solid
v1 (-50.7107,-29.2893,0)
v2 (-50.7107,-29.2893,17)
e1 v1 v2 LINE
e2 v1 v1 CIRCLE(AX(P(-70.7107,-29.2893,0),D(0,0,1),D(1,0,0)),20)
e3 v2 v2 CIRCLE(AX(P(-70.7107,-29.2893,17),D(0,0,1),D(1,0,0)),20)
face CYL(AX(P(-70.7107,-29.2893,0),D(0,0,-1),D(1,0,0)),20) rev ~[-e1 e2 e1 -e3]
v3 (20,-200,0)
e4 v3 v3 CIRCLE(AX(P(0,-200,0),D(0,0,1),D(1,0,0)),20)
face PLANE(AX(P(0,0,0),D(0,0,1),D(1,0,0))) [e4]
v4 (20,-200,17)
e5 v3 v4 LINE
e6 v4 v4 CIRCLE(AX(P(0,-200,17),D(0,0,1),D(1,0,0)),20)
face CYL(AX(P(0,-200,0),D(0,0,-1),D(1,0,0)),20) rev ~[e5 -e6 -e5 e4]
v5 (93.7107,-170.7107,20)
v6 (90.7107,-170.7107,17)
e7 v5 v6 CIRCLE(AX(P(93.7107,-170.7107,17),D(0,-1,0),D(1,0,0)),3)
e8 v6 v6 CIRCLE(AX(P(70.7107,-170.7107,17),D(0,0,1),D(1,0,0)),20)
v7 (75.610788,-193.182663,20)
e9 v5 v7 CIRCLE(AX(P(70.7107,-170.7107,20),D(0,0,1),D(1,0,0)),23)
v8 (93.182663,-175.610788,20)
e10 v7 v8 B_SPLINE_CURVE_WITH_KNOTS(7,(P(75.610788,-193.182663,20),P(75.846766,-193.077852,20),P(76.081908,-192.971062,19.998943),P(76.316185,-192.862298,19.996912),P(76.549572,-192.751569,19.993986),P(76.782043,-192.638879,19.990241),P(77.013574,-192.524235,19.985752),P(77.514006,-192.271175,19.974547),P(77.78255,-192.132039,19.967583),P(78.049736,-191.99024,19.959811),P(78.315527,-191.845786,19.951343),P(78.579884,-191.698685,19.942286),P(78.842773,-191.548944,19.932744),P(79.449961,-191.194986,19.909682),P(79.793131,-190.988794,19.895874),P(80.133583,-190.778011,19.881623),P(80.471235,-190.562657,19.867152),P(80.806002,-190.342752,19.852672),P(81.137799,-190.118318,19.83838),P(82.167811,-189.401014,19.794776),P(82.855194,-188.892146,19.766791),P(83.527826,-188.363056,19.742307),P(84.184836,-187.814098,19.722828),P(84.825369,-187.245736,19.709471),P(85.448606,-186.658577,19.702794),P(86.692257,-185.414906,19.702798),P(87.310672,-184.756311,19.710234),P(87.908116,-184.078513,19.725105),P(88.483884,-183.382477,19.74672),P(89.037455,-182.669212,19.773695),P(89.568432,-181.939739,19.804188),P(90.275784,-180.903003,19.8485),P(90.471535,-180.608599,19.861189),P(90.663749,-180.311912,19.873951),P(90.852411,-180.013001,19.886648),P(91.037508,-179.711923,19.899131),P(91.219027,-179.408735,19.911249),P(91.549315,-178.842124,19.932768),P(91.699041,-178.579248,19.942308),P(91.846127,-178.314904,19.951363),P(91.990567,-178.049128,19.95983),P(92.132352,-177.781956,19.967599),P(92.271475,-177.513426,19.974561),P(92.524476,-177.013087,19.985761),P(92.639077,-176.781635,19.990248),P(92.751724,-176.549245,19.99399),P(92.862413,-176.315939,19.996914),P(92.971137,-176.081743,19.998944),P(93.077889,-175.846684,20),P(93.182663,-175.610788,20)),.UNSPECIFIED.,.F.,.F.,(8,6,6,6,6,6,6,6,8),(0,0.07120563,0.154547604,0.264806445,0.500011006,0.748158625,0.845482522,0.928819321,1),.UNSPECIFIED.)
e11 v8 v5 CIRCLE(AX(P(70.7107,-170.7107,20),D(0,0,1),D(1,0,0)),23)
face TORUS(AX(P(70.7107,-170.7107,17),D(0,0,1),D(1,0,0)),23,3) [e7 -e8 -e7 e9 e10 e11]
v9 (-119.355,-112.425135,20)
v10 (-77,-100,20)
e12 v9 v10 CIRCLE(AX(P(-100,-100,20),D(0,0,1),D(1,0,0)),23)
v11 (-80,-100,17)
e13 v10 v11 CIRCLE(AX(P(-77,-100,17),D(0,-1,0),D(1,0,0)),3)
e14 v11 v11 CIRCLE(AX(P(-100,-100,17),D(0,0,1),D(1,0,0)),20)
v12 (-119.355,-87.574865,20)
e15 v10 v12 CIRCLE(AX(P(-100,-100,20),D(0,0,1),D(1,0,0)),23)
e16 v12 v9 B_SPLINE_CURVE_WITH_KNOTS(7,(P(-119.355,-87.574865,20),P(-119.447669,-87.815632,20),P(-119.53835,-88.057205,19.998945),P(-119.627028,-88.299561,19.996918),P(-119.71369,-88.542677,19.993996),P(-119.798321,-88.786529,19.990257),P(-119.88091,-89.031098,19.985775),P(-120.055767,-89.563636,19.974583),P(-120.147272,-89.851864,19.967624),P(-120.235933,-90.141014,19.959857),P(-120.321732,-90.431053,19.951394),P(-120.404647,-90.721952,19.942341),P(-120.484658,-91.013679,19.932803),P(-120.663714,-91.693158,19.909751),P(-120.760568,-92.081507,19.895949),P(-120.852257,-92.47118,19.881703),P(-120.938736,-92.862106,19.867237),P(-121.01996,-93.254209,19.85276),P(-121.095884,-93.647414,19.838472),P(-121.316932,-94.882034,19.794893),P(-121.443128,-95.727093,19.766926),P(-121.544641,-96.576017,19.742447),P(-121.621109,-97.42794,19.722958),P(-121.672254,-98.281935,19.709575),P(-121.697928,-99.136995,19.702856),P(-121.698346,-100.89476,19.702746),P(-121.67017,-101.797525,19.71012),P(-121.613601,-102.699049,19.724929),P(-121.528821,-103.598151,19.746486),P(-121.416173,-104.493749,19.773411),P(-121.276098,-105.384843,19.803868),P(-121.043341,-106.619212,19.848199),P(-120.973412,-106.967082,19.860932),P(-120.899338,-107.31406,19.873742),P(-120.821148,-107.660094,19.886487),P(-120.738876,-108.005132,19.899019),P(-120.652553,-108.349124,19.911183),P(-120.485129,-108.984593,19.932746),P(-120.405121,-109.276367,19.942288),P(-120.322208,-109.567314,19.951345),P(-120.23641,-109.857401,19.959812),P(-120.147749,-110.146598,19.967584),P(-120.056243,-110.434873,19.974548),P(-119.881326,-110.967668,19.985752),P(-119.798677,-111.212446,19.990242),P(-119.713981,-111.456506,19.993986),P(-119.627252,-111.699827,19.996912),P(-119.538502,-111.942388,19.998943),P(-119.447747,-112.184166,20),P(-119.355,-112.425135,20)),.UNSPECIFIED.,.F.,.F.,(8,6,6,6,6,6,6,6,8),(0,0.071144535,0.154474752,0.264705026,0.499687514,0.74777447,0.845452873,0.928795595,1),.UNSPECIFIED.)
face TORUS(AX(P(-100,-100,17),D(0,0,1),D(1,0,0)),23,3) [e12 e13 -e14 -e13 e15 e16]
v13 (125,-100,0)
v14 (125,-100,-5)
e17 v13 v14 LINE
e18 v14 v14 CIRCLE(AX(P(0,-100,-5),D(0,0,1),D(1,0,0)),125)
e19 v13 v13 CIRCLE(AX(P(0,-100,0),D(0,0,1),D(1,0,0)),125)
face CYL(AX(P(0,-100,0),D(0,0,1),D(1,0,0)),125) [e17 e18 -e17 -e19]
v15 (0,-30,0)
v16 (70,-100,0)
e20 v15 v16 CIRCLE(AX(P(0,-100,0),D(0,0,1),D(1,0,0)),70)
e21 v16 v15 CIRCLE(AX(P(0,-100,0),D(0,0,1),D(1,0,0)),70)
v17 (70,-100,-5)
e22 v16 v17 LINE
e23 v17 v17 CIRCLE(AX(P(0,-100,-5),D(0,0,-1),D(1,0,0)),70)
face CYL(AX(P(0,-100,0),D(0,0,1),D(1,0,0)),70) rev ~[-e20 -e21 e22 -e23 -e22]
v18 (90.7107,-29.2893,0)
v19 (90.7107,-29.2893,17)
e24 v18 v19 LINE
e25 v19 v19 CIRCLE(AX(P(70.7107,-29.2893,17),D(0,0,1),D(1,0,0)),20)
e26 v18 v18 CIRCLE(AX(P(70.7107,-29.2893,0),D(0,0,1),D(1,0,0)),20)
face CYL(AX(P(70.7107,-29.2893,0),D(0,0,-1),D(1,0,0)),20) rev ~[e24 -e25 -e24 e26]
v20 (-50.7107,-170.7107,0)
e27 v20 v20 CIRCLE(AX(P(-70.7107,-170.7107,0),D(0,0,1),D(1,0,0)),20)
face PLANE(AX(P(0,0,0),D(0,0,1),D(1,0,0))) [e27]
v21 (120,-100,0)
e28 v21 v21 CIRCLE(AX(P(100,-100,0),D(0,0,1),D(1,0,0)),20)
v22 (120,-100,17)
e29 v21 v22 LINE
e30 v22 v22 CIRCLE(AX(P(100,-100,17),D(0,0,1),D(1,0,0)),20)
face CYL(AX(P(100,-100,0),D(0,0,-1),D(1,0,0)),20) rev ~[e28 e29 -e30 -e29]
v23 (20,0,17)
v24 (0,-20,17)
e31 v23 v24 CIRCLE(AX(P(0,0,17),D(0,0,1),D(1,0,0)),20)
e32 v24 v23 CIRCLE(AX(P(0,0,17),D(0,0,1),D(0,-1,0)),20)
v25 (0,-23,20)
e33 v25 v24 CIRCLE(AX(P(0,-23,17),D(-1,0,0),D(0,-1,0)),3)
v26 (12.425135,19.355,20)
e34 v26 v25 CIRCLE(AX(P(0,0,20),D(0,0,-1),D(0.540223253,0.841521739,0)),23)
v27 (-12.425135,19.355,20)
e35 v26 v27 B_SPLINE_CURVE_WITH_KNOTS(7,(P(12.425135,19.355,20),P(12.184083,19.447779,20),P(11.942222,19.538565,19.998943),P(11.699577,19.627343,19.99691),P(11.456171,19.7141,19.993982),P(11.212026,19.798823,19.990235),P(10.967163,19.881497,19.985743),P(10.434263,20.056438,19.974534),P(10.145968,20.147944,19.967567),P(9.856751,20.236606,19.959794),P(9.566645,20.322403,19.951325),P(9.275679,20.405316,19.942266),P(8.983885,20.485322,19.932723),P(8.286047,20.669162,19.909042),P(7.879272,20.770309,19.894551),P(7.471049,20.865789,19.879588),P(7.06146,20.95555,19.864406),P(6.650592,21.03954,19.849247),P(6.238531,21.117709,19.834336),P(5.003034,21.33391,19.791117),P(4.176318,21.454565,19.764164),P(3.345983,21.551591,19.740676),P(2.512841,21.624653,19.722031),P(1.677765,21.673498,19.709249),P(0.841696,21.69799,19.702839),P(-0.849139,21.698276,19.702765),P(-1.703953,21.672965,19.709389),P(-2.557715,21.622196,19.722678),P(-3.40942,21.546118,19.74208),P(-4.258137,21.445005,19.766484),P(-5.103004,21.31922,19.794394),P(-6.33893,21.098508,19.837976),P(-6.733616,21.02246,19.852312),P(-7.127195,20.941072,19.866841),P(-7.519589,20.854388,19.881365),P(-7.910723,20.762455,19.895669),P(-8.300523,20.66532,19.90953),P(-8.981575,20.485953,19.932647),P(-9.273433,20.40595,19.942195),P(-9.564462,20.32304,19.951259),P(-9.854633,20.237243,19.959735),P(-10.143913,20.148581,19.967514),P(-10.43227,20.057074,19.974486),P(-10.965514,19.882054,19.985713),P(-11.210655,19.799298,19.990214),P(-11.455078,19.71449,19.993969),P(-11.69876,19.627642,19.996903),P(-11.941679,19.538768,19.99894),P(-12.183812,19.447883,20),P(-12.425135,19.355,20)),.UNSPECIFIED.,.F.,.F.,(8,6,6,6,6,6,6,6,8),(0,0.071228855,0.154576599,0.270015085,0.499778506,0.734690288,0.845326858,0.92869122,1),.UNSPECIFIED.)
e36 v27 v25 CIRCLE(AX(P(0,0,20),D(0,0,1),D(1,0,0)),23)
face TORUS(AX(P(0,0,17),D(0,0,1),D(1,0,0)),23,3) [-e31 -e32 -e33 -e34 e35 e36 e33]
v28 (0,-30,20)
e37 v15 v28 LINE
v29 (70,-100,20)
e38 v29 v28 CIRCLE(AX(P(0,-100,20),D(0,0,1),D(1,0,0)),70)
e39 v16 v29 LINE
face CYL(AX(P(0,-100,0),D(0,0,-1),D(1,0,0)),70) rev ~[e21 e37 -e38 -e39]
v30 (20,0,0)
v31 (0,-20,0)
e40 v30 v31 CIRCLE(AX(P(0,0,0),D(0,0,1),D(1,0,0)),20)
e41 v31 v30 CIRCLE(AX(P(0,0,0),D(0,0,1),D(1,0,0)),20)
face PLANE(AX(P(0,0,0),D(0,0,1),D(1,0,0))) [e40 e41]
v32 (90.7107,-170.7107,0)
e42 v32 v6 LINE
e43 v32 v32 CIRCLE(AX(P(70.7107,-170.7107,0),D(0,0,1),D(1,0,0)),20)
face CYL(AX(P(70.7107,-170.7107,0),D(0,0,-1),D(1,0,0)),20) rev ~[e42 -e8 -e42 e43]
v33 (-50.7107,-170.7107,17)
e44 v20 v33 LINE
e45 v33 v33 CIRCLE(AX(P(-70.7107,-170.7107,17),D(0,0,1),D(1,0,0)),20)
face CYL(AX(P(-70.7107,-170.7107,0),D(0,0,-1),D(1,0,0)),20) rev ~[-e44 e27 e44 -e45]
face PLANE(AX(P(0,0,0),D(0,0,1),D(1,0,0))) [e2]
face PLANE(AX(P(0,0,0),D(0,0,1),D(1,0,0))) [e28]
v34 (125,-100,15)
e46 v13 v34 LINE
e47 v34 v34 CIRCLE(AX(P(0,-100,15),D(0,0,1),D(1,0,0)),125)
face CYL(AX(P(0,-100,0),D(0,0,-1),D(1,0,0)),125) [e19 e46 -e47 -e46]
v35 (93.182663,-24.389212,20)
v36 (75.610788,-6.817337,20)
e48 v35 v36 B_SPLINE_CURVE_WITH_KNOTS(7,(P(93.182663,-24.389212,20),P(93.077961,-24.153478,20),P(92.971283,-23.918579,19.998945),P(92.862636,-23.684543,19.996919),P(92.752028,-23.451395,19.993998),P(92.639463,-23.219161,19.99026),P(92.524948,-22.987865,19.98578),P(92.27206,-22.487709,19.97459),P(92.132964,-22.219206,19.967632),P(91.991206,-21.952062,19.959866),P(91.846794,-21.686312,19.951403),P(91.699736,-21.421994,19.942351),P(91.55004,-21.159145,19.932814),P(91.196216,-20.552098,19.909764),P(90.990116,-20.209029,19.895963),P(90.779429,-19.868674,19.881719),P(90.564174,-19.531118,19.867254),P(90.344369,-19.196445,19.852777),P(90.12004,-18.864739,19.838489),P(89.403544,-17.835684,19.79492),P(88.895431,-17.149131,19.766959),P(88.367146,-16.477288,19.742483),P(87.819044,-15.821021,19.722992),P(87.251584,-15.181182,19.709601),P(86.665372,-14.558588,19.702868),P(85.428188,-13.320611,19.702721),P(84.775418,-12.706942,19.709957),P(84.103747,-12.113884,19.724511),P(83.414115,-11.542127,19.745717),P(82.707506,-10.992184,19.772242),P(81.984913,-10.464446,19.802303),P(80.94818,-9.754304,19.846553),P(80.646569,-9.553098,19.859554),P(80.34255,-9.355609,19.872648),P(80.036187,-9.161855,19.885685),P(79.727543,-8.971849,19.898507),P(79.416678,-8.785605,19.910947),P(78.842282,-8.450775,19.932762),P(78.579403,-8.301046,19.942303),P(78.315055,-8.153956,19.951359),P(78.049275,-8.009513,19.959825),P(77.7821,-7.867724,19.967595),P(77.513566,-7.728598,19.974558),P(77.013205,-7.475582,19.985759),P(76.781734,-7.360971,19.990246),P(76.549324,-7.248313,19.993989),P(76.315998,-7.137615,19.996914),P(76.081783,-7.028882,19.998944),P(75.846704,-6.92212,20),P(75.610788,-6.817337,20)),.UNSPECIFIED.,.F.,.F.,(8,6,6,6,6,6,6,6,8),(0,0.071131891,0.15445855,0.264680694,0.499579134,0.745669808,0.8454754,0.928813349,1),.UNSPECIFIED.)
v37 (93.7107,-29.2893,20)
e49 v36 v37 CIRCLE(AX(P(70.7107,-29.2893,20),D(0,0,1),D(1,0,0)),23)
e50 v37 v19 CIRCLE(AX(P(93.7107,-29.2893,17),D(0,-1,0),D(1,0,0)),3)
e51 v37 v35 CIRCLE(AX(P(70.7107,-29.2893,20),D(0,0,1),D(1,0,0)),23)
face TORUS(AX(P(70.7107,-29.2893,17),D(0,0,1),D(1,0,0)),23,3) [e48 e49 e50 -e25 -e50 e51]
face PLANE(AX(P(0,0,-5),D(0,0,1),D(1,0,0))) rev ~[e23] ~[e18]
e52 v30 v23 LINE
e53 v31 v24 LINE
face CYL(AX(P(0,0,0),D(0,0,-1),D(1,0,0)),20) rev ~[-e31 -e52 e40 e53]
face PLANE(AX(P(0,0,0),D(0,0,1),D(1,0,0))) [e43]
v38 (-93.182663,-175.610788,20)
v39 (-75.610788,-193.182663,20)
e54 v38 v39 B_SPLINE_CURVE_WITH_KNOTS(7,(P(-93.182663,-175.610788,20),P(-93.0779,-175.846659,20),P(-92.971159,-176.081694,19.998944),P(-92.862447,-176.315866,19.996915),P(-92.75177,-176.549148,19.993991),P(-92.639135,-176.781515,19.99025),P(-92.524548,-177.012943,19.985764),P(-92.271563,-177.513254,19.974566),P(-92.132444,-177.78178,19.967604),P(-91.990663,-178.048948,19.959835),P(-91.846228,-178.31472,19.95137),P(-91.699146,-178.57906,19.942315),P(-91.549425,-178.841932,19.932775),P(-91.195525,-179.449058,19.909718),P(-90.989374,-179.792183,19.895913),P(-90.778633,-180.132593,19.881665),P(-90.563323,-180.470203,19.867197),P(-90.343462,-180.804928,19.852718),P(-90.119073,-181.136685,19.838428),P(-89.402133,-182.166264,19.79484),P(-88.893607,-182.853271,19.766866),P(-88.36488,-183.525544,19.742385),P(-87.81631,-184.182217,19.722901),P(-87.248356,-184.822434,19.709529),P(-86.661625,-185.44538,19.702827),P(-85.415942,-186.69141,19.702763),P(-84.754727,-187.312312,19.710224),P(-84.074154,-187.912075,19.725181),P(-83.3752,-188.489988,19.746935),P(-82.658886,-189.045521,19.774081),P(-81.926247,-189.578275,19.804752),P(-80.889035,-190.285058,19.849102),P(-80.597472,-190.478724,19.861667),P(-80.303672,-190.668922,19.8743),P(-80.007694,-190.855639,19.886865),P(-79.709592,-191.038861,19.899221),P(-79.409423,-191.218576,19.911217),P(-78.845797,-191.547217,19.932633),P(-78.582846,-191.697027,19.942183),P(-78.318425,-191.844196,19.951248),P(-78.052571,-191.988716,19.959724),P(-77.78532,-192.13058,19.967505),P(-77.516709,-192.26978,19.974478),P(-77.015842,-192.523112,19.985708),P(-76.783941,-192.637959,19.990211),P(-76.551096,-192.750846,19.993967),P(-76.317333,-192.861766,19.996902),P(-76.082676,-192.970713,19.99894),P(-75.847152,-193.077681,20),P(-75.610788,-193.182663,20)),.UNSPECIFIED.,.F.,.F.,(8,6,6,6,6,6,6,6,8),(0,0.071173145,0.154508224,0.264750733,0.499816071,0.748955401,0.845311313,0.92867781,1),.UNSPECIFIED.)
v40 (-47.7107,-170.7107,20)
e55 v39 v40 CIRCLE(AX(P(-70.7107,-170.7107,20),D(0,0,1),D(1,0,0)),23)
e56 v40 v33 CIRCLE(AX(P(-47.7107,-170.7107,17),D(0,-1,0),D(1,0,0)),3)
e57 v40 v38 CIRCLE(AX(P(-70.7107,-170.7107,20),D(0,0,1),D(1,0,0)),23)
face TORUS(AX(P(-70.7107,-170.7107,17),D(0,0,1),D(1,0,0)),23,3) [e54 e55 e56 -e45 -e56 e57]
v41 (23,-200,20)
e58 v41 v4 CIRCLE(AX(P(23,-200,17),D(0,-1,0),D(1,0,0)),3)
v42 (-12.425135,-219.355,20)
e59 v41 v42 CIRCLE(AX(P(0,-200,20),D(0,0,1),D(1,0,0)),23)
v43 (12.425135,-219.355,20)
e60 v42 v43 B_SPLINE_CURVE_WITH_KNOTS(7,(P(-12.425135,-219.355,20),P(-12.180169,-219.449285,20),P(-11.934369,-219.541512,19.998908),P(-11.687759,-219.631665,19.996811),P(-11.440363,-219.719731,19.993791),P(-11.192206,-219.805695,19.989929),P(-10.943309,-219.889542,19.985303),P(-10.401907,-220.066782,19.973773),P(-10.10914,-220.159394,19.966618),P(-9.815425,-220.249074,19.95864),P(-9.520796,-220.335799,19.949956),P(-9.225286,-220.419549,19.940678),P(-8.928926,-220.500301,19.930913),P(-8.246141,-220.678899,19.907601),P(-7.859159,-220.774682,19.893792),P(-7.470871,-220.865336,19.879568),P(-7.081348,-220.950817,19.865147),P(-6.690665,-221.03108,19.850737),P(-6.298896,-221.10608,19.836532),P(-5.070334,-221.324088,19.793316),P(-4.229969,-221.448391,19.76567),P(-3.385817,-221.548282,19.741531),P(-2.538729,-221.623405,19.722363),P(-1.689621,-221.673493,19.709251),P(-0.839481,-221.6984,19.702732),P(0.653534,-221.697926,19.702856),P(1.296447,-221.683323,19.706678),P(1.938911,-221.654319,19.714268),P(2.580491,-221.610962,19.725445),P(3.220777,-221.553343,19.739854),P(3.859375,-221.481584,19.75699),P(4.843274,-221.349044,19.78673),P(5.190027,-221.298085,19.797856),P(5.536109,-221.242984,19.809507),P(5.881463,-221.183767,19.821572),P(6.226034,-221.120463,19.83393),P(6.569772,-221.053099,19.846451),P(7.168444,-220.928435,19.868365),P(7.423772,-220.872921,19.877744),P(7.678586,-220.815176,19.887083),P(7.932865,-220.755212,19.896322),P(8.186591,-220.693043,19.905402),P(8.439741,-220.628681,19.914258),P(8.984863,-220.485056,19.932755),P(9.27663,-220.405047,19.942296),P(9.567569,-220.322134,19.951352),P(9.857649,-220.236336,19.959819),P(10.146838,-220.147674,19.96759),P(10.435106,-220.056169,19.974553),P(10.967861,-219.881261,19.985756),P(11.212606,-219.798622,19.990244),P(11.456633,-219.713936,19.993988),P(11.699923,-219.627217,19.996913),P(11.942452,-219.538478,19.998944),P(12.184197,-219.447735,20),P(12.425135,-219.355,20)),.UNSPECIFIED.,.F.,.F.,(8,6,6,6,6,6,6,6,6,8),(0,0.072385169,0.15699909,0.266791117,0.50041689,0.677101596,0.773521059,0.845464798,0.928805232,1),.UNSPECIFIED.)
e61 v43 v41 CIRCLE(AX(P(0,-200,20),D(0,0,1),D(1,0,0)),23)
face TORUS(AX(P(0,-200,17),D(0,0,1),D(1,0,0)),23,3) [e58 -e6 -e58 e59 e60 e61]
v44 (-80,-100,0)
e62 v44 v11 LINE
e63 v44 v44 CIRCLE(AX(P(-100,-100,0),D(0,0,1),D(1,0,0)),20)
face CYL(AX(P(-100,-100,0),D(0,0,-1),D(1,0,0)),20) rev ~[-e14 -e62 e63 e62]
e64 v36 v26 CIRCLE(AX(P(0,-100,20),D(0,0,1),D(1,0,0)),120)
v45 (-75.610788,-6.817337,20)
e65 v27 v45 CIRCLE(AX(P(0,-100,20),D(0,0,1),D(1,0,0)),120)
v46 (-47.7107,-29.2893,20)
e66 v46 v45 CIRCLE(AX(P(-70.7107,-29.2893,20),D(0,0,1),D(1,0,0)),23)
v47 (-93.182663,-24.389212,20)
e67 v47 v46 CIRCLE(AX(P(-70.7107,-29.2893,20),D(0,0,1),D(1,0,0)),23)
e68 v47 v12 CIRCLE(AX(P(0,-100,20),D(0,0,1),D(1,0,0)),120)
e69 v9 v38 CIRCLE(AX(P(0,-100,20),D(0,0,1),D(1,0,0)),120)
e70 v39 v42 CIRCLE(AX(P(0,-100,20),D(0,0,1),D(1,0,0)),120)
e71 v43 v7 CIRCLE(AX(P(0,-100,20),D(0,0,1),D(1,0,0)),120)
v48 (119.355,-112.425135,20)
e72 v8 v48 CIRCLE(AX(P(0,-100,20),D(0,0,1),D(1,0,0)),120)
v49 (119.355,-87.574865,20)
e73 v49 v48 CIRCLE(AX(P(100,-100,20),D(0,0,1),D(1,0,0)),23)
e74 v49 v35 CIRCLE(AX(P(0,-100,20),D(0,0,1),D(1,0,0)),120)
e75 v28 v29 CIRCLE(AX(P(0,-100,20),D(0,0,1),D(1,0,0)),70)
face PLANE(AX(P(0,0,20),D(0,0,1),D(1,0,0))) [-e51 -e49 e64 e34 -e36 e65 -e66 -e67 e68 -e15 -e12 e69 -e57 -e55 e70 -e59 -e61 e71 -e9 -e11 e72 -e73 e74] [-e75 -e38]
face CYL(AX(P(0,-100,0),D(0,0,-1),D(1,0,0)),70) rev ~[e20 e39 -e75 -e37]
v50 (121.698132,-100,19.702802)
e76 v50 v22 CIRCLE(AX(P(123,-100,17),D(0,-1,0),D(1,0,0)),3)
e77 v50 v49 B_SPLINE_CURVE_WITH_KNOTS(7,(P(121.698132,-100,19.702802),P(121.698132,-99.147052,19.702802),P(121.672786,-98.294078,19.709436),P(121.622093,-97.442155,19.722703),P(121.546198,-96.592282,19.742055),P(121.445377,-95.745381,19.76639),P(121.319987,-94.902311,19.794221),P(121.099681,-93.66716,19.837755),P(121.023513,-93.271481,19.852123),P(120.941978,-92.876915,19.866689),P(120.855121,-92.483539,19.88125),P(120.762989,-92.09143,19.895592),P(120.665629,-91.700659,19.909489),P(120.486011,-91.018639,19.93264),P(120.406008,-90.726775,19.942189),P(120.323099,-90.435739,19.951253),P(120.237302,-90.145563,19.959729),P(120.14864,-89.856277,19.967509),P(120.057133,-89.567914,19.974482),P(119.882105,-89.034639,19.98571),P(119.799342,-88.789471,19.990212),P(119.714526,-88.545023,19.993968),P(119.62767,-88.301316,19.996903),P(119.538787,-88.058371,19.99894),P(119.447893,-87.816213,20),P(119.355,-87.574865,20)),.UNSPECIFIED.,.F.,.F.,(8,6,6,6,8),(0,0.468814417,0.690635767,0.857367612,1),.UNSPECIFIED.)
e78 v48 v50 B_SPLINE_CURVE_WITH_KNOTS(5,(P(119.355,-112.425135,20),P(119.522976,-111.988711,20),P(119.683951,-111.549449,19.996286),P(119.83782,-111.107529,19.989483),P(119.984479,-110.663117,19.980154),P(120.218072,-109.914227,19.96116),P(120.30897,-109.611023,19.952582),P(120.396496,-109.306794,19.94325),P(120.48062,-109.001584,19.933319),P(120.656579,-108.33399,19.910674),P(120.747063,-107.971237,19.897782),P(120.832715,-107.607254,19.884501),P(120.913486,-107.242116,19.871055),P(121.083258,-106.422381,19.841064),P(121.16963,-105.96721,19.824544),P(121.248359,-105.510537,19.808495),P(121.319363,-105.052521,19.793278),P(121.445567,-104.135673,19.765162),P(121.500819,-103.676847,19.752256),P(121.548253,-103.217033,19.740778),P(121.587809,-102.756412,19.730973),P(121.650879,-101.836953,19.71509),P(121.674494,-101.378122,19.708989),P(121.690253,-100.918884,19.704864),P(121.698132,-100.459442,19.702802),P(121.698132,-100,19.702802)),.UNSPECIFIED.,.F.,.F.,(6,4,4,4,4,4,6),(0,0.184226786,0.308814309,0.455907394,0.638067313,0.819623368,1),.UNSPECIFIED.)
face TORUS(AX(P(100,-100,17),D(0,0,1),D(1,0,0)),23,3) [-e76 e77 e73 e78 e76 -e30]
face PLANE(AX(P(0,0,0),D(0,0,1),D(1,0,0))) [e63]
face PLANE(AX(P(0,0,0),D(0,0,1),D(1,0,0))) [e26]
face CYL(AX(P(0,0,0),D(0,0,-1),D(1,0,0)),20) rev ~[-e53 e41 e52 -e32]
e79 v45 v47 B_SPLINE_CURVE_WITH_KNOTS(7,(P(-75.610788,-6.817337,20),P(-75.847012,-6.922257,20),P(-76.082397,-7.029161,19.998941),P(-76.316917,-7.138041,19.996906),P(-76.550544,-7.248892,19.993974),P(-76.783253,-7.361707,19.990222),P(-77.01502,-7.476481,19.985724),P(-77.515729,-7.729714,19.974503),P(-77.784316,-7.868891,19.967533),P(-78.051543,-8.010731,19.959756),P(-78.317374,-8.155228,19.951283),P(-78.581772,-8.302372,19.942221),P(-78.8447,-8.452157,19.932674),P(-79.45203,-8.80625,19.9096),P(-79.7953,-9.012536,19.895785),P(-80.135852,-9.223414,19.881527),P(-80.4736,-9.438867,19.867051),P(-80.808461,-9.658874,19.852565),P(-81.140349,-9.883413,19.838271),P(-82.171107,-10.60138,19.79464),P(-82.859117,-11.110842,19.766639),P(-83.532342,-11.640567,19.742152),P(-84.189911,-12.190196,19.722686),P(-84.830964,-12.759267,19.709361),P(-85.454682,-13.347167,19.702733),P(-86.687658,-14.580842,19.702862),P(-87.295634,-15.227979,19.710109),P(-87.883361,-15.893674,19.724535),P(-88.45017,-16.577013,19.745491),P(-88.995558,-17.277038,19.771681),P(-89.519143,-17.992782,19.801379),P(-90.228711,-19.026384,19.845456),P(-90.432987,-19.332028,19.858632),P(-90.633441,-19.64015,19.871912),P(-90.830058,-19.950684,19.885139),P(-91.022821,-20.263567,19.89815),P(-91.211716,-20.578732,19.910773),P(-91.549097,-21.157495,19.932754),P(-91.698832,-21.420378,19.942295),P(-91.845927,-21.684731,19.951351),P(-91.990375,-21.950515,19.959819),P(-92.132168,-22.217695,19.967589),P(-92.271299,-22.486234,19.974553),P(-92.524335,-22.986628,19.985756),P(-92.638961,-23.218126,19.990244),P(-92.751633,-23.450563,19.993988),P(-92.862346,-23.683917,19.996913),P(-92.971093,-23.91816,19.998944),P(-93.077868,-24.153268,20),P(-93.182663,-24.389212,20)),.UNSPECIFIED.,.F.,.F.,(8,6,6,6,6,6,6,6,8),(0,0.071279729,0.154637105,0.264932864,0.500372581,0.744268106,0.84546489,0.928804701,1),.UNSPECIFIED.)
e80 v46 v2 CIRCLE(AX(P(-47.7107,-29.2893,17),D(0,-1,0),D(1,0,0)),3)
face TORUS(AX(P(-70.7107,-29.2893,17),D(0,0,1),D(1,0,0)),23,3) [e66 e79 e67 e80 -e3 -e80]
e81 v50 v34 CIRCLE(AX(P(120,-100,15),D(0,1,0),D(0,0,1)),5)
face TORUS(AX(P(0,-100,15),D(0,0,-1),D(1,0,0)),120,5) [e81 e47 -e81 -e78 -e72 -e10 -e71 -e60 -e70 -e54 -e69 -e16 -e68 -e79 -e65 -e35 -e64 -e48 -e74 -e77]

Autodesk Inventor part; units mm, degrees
ref_plane "YZ Plane" through (0, 0, 0) normal (1, 0, 0) x (0, 1, 0)
ref_plane "XZ Plane" through (0, 0, 0) normal (0, 1, 0) x (-1, 0, 0)
ref_plane "XY Plane" through (0, 0, 0) normal (0, 0, 1) x (1, 0, 0)
sketch "Sketch1" plane through (0, 0, 0) normal (0, 0, 1) x (1, 0, 0)
  circle A0 centre (0, 0) radius 20
  line L0 (0, 0) -> (0, -100)
  line L1 (0, 0) -> (100, 0) construction
  circle A1 centre (-70.7107, -29.2893) radius 20
  circle A2 centre (-100, -100) radius 20
  circle A3 centre (-70.7107, -170.7107) radius 20
  circle A4 centre (0, -200) radius 20
  circle A5 centre (70.7107, -170.7107) radius 20
  circle A6 centre (100, -100) radius 20
  circle A7 centre (70.7107, -29.2893) radius 20
  circle A8 centre (0, -100) radius 125
  circle A9 centre (0, -100) radius 70
  dimension "d0" = 40
  dimension "d1" = 100
  dimension "d2" = 90
  dimension "d5" = 360
  dimension "d7" = 250
  dimension "d9" = 140
extrude "Extrusion1" add sketch "Sketch1" along normal blind 20
extrude "Extrusion2" add sketch "Sketch1" against normal blind 5 contours A0 | A1 | A2 | A3 | A4 | A5 | A6 | A7 | A8
fillet "Fillet1" radius 3 8 edges at (-90.7107, -170.7107, 20) (-120, -100, 20) (-90.7107, -29.2893, 20) (-20, 0, 20) (50.7107, -29.2893, 20) (80, -100, 20) (50.7107, -170.7107, 20) (-20, -200, 20)
fillet "Fillet2" radius 5 1 edges at (-125, -100, 20)
properties part number "Baseplate"
